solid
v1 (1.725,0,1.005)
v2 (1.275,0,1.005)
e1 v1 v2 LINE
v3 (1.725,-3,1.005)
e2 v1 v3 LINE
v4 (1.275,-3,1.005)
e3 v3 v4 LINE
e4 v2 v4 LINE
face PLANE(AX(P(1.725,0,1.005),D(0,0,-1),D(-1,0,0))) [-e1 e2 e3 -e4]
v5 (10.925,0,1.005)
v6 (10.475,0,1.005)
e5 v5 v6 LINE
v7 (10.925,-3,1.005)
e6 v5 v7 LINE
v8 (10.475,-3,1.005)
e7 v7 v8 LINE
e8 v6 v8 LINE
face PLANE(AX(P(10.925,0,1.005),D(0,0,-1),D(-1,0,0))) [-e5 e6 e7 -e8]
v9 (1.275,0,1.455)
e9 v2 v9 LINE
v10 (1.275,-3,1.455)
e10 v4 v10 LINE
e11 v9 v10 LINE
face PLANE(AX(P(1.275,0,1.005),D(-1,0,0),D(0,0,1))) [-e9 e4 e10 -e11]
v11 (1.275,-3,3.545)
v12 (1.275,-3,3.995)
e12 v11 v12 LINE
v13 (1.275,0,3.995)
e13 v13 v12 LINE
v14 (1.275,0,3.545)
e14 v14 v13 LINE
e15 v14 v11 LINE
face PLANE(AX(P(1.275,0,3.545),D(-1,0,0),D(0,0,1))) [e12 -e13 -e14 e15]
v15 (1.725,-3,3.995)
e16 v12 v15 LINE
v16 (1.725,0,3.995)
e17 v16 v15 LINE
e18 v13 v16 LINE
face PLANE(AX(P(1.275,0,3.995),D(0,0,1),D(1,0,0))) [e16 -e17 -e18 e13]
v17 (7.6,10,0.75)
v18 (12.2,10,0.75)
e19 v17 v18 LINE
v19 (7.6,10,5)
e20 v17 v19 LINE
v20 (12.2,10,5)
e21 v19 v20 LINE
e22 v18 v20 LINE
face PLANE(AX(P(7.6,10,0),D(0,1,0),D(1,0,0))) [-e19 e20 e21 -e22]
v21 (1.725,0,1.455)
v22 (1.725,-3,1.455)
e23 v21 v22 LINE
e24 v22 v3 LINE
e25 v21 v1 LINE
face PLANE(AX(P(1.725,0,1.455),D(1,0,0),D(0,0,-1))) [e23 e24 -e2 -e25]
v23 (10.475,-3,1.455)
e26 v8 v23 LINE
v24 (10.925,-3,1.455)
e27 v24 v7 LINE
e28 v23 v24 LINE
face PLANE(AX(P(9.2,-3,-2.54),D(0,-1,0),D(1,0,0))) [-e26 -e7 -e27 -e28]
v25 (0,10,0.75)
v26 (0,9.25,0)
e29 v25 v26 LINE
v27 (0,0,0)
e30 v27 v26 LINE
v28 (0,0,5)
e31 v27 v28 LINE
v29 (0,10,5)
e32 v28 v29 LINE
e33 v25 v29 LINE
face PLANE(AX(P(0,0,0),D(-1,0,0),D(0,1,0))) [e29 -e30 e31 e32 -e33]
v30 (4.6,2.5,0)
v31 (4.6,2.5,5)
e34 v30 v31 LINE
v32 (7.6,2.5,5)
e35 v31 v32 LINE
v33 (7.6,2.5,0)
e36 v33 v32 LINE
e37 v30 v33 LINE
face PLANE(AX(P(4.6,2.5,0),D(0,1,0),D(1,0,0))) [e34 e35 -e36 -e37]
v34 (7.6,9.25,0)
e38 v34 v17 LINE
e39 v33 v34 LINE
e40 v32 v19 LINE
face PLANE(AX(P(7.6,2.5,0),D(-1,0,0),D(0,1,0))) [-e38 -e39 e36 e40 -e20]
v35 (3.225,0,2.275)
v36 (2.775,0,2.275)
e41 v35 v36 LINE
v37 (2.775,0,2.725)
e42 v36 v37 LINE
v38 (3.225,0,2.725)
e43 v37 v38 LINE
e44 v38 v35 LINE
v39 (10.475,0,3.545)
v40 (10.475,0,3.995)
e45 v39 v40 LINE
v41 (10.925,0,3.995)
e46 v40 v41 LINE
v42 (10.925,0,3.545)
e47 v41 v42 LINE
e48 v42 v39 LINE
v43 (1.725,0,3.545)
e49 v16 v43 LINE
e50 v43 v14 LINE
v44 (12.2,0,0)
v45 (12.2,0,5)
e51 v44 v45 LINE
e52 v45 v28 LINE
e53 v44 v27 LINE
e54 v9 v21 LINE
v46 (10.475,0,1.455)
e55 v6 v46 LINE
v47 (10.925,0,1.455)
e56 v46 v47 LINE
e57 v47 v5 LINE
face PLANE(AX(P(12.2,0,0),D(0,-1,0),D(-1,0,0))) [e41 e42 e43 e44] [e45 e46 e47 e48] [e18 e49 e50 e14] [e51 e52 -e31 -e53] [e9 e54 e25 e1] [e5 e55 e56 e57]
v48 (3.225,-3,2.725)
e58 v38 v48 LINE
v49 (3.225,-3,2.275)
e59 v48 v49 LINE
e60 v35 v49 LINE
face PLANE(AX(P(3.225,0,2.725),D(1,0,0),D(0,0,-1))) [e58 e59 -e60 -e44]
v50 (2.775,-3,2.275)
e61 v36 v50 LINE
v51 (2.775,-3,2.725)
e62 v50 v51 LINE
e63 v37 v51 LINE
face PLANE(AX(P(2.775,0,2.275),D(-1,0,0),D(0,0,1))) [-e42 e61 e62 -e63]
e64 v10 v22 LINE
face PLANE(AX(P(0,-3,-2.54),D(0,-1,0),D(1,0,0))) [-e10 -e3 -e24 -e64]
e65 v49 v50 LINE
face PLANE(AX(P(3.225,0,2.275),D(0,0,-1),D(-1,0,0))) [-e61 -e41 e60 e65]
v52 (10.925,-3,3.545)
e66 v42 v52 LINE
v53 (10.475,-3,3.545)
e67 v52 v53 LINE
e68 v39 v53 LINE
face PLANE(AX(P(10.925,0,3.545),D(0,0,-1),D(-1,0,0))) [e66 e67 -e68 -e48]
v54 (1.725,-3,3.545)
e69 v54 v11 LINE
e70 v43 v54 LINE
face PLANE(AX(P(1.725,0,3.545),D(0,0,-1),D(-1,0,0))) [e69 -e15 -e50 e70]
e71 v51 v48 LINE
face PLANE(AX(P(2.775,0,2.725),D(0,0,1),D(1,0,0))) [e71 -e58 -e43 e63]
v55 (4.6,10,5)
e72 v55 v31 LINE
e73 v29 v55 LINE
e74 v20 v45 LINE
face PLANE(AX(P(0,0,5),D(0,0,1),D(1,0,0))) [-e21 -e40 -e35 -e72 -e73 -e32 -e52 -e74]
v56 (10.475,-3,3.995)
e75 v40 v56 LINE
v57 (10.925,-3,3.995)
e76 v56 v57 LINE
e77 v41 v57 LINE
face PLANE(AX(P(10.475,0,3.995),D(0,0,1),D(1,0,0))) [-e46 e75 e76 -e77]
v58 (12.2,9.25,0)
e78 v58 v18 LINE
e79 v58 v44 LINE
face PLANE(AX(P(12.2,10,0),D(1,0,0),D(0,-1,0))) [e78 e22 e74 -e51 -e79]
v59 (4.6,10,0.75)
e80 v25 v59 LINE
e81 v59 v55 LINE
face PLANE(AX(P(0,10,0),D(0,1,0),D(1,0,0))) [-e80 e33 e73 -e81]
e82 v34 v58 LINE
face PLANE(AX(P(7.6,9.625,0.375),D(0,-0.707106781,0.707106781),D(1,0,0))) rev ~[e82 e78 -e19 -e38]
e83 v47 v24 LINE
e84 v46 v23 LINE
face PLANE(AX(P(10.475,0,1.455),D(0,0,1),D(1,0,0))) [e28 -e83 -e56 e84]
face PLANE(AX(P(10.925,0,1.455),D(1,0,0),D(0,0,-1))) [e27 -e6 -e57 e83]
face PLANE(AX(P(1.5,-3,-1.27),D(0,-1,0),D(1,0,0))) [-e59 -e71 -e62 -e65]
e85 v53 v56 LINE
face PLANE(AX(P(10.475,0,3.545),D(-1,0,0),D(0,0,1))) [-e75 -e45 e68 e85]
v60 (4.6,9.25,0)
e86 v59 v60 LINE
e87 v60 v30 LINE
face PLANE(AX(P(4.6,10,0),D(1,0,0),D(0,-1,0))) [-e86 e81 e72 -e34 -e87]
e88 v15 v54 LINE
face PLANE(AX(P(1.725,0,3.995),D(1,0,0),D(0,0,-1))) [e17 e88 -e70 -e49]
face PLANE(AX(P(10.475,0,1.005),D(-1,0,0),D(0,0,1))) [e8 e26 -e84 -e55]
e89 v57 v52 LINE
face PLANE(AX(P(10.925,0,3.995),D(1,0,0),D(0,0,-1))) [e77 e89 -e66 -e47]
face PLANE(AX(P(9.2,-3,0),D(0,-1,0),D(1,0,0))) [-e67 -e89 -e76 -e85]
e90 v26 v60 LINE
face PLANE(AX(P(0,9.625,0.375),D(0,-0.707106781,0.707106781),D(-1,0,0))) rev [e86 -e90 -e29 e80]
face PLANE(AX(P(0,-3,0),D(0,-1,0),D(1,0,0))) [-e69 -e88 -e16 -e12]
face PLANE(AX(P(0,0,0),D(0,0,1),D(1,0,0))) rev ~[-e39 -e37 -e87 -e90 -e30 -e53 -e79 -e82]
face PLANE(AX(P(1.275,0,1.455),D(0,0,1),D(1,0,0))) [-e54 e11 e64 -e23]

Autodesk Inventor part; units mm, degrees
ref_plane "YZ Plane" through (0, 0, 0) normal (1, 0, 0) x (0, 1, 0)
ref_plane "XZ Plane" through (0, 0, 0) normal (0, 1, 0) x (-1, 0, 0)
ref_plane "XY Plane" through (0, 0, 0) normal (0, 0, 1) x (1, 0, 0)
sketch "Sketch1" plane through (0, 0, 0) normal (0, 0, 1) x (1, 0, 0)
  line L0 (0, 0) -> (0, 10)
  line L1 (0, 10) -> (4.6, 10)
  line L2 (4.6, 10) -> (4.6, 2.5)
  line L3 (4.6, 2.5) -> (7.6, 2.5)
  line L4 (7.6, 2.5) -> (7.6, 10)
  line L5 (7.6, 10) -> (12.2, 10)
  line L6 (12.2, 10) -> (12.2, 0)
  line L7 (12.2, 0) -> (0, 0)
  dimension "d0" = 12.2
  dimension "d1" = 10
  dimension "d2" = 7.5
  dimension "d3" = 3
extrude "Extrusion1" add sketch "Sketch1" along normal blind 5
sketch "Sketch2" plane through (0, 0, 0) normal (0, -1, 0) x (1, 0, 0)
  line L0 (0, 0) -> (0, 5) projected
  line L1 (1.5, 3.77) -> (10.7, 3.77) construction
  line L2 (0, 5) -> (12.2, 5) construction
  line L3 (1.275, 3.995) -> (1.725, 3.995)
  line L4 (1.725, 3.995) -> (1.725, 3.545)
  line L5 (1.725, 3.545) -> (1.275, 3.545)
  line L6 (1.275, 3.545) -> (1.275, 3.995)
  line L7 (1.275, 3.995) -> (1.725, 3.545) construction
  line L8 (1.725, 3.995) -> (1.275, 3.545) construction
  point P0 (1.5, 1.23)
  point P1 (3, 2.5)
  point P2 (10.7, 1.23)
  point P3 (0, 2.5)
  point P4 (6.1, 3.77)
  point P5 (6.1, 5)
  dimension "d6" = 1.27
  dimension "d7" = 1.27
  dimension "d8" = 1.5
  dimension "d9" = 9.2
  dimension "d10" = 0.45
  dimension "d11" = 0.45
extrude "Extrusion2" add sketch "Sketch2" along normal blind 3
pattern_sketch "Sketch Driven Pattern1" of "Extrusion2" from (1.5, 0, 3.77) copies at (1.5, 0, 1.23) at (3, 0, 2.5) at (10.7, 0, 3.77) at (10.7, 0, 1.23)
chamfer "Chamfer1" distance 0.75 angle 45 2 edges at (9.9, 10, 0) (2.3, 10, 0)
properties part number "GP1A52HRJ00F (Large slot detector)"
